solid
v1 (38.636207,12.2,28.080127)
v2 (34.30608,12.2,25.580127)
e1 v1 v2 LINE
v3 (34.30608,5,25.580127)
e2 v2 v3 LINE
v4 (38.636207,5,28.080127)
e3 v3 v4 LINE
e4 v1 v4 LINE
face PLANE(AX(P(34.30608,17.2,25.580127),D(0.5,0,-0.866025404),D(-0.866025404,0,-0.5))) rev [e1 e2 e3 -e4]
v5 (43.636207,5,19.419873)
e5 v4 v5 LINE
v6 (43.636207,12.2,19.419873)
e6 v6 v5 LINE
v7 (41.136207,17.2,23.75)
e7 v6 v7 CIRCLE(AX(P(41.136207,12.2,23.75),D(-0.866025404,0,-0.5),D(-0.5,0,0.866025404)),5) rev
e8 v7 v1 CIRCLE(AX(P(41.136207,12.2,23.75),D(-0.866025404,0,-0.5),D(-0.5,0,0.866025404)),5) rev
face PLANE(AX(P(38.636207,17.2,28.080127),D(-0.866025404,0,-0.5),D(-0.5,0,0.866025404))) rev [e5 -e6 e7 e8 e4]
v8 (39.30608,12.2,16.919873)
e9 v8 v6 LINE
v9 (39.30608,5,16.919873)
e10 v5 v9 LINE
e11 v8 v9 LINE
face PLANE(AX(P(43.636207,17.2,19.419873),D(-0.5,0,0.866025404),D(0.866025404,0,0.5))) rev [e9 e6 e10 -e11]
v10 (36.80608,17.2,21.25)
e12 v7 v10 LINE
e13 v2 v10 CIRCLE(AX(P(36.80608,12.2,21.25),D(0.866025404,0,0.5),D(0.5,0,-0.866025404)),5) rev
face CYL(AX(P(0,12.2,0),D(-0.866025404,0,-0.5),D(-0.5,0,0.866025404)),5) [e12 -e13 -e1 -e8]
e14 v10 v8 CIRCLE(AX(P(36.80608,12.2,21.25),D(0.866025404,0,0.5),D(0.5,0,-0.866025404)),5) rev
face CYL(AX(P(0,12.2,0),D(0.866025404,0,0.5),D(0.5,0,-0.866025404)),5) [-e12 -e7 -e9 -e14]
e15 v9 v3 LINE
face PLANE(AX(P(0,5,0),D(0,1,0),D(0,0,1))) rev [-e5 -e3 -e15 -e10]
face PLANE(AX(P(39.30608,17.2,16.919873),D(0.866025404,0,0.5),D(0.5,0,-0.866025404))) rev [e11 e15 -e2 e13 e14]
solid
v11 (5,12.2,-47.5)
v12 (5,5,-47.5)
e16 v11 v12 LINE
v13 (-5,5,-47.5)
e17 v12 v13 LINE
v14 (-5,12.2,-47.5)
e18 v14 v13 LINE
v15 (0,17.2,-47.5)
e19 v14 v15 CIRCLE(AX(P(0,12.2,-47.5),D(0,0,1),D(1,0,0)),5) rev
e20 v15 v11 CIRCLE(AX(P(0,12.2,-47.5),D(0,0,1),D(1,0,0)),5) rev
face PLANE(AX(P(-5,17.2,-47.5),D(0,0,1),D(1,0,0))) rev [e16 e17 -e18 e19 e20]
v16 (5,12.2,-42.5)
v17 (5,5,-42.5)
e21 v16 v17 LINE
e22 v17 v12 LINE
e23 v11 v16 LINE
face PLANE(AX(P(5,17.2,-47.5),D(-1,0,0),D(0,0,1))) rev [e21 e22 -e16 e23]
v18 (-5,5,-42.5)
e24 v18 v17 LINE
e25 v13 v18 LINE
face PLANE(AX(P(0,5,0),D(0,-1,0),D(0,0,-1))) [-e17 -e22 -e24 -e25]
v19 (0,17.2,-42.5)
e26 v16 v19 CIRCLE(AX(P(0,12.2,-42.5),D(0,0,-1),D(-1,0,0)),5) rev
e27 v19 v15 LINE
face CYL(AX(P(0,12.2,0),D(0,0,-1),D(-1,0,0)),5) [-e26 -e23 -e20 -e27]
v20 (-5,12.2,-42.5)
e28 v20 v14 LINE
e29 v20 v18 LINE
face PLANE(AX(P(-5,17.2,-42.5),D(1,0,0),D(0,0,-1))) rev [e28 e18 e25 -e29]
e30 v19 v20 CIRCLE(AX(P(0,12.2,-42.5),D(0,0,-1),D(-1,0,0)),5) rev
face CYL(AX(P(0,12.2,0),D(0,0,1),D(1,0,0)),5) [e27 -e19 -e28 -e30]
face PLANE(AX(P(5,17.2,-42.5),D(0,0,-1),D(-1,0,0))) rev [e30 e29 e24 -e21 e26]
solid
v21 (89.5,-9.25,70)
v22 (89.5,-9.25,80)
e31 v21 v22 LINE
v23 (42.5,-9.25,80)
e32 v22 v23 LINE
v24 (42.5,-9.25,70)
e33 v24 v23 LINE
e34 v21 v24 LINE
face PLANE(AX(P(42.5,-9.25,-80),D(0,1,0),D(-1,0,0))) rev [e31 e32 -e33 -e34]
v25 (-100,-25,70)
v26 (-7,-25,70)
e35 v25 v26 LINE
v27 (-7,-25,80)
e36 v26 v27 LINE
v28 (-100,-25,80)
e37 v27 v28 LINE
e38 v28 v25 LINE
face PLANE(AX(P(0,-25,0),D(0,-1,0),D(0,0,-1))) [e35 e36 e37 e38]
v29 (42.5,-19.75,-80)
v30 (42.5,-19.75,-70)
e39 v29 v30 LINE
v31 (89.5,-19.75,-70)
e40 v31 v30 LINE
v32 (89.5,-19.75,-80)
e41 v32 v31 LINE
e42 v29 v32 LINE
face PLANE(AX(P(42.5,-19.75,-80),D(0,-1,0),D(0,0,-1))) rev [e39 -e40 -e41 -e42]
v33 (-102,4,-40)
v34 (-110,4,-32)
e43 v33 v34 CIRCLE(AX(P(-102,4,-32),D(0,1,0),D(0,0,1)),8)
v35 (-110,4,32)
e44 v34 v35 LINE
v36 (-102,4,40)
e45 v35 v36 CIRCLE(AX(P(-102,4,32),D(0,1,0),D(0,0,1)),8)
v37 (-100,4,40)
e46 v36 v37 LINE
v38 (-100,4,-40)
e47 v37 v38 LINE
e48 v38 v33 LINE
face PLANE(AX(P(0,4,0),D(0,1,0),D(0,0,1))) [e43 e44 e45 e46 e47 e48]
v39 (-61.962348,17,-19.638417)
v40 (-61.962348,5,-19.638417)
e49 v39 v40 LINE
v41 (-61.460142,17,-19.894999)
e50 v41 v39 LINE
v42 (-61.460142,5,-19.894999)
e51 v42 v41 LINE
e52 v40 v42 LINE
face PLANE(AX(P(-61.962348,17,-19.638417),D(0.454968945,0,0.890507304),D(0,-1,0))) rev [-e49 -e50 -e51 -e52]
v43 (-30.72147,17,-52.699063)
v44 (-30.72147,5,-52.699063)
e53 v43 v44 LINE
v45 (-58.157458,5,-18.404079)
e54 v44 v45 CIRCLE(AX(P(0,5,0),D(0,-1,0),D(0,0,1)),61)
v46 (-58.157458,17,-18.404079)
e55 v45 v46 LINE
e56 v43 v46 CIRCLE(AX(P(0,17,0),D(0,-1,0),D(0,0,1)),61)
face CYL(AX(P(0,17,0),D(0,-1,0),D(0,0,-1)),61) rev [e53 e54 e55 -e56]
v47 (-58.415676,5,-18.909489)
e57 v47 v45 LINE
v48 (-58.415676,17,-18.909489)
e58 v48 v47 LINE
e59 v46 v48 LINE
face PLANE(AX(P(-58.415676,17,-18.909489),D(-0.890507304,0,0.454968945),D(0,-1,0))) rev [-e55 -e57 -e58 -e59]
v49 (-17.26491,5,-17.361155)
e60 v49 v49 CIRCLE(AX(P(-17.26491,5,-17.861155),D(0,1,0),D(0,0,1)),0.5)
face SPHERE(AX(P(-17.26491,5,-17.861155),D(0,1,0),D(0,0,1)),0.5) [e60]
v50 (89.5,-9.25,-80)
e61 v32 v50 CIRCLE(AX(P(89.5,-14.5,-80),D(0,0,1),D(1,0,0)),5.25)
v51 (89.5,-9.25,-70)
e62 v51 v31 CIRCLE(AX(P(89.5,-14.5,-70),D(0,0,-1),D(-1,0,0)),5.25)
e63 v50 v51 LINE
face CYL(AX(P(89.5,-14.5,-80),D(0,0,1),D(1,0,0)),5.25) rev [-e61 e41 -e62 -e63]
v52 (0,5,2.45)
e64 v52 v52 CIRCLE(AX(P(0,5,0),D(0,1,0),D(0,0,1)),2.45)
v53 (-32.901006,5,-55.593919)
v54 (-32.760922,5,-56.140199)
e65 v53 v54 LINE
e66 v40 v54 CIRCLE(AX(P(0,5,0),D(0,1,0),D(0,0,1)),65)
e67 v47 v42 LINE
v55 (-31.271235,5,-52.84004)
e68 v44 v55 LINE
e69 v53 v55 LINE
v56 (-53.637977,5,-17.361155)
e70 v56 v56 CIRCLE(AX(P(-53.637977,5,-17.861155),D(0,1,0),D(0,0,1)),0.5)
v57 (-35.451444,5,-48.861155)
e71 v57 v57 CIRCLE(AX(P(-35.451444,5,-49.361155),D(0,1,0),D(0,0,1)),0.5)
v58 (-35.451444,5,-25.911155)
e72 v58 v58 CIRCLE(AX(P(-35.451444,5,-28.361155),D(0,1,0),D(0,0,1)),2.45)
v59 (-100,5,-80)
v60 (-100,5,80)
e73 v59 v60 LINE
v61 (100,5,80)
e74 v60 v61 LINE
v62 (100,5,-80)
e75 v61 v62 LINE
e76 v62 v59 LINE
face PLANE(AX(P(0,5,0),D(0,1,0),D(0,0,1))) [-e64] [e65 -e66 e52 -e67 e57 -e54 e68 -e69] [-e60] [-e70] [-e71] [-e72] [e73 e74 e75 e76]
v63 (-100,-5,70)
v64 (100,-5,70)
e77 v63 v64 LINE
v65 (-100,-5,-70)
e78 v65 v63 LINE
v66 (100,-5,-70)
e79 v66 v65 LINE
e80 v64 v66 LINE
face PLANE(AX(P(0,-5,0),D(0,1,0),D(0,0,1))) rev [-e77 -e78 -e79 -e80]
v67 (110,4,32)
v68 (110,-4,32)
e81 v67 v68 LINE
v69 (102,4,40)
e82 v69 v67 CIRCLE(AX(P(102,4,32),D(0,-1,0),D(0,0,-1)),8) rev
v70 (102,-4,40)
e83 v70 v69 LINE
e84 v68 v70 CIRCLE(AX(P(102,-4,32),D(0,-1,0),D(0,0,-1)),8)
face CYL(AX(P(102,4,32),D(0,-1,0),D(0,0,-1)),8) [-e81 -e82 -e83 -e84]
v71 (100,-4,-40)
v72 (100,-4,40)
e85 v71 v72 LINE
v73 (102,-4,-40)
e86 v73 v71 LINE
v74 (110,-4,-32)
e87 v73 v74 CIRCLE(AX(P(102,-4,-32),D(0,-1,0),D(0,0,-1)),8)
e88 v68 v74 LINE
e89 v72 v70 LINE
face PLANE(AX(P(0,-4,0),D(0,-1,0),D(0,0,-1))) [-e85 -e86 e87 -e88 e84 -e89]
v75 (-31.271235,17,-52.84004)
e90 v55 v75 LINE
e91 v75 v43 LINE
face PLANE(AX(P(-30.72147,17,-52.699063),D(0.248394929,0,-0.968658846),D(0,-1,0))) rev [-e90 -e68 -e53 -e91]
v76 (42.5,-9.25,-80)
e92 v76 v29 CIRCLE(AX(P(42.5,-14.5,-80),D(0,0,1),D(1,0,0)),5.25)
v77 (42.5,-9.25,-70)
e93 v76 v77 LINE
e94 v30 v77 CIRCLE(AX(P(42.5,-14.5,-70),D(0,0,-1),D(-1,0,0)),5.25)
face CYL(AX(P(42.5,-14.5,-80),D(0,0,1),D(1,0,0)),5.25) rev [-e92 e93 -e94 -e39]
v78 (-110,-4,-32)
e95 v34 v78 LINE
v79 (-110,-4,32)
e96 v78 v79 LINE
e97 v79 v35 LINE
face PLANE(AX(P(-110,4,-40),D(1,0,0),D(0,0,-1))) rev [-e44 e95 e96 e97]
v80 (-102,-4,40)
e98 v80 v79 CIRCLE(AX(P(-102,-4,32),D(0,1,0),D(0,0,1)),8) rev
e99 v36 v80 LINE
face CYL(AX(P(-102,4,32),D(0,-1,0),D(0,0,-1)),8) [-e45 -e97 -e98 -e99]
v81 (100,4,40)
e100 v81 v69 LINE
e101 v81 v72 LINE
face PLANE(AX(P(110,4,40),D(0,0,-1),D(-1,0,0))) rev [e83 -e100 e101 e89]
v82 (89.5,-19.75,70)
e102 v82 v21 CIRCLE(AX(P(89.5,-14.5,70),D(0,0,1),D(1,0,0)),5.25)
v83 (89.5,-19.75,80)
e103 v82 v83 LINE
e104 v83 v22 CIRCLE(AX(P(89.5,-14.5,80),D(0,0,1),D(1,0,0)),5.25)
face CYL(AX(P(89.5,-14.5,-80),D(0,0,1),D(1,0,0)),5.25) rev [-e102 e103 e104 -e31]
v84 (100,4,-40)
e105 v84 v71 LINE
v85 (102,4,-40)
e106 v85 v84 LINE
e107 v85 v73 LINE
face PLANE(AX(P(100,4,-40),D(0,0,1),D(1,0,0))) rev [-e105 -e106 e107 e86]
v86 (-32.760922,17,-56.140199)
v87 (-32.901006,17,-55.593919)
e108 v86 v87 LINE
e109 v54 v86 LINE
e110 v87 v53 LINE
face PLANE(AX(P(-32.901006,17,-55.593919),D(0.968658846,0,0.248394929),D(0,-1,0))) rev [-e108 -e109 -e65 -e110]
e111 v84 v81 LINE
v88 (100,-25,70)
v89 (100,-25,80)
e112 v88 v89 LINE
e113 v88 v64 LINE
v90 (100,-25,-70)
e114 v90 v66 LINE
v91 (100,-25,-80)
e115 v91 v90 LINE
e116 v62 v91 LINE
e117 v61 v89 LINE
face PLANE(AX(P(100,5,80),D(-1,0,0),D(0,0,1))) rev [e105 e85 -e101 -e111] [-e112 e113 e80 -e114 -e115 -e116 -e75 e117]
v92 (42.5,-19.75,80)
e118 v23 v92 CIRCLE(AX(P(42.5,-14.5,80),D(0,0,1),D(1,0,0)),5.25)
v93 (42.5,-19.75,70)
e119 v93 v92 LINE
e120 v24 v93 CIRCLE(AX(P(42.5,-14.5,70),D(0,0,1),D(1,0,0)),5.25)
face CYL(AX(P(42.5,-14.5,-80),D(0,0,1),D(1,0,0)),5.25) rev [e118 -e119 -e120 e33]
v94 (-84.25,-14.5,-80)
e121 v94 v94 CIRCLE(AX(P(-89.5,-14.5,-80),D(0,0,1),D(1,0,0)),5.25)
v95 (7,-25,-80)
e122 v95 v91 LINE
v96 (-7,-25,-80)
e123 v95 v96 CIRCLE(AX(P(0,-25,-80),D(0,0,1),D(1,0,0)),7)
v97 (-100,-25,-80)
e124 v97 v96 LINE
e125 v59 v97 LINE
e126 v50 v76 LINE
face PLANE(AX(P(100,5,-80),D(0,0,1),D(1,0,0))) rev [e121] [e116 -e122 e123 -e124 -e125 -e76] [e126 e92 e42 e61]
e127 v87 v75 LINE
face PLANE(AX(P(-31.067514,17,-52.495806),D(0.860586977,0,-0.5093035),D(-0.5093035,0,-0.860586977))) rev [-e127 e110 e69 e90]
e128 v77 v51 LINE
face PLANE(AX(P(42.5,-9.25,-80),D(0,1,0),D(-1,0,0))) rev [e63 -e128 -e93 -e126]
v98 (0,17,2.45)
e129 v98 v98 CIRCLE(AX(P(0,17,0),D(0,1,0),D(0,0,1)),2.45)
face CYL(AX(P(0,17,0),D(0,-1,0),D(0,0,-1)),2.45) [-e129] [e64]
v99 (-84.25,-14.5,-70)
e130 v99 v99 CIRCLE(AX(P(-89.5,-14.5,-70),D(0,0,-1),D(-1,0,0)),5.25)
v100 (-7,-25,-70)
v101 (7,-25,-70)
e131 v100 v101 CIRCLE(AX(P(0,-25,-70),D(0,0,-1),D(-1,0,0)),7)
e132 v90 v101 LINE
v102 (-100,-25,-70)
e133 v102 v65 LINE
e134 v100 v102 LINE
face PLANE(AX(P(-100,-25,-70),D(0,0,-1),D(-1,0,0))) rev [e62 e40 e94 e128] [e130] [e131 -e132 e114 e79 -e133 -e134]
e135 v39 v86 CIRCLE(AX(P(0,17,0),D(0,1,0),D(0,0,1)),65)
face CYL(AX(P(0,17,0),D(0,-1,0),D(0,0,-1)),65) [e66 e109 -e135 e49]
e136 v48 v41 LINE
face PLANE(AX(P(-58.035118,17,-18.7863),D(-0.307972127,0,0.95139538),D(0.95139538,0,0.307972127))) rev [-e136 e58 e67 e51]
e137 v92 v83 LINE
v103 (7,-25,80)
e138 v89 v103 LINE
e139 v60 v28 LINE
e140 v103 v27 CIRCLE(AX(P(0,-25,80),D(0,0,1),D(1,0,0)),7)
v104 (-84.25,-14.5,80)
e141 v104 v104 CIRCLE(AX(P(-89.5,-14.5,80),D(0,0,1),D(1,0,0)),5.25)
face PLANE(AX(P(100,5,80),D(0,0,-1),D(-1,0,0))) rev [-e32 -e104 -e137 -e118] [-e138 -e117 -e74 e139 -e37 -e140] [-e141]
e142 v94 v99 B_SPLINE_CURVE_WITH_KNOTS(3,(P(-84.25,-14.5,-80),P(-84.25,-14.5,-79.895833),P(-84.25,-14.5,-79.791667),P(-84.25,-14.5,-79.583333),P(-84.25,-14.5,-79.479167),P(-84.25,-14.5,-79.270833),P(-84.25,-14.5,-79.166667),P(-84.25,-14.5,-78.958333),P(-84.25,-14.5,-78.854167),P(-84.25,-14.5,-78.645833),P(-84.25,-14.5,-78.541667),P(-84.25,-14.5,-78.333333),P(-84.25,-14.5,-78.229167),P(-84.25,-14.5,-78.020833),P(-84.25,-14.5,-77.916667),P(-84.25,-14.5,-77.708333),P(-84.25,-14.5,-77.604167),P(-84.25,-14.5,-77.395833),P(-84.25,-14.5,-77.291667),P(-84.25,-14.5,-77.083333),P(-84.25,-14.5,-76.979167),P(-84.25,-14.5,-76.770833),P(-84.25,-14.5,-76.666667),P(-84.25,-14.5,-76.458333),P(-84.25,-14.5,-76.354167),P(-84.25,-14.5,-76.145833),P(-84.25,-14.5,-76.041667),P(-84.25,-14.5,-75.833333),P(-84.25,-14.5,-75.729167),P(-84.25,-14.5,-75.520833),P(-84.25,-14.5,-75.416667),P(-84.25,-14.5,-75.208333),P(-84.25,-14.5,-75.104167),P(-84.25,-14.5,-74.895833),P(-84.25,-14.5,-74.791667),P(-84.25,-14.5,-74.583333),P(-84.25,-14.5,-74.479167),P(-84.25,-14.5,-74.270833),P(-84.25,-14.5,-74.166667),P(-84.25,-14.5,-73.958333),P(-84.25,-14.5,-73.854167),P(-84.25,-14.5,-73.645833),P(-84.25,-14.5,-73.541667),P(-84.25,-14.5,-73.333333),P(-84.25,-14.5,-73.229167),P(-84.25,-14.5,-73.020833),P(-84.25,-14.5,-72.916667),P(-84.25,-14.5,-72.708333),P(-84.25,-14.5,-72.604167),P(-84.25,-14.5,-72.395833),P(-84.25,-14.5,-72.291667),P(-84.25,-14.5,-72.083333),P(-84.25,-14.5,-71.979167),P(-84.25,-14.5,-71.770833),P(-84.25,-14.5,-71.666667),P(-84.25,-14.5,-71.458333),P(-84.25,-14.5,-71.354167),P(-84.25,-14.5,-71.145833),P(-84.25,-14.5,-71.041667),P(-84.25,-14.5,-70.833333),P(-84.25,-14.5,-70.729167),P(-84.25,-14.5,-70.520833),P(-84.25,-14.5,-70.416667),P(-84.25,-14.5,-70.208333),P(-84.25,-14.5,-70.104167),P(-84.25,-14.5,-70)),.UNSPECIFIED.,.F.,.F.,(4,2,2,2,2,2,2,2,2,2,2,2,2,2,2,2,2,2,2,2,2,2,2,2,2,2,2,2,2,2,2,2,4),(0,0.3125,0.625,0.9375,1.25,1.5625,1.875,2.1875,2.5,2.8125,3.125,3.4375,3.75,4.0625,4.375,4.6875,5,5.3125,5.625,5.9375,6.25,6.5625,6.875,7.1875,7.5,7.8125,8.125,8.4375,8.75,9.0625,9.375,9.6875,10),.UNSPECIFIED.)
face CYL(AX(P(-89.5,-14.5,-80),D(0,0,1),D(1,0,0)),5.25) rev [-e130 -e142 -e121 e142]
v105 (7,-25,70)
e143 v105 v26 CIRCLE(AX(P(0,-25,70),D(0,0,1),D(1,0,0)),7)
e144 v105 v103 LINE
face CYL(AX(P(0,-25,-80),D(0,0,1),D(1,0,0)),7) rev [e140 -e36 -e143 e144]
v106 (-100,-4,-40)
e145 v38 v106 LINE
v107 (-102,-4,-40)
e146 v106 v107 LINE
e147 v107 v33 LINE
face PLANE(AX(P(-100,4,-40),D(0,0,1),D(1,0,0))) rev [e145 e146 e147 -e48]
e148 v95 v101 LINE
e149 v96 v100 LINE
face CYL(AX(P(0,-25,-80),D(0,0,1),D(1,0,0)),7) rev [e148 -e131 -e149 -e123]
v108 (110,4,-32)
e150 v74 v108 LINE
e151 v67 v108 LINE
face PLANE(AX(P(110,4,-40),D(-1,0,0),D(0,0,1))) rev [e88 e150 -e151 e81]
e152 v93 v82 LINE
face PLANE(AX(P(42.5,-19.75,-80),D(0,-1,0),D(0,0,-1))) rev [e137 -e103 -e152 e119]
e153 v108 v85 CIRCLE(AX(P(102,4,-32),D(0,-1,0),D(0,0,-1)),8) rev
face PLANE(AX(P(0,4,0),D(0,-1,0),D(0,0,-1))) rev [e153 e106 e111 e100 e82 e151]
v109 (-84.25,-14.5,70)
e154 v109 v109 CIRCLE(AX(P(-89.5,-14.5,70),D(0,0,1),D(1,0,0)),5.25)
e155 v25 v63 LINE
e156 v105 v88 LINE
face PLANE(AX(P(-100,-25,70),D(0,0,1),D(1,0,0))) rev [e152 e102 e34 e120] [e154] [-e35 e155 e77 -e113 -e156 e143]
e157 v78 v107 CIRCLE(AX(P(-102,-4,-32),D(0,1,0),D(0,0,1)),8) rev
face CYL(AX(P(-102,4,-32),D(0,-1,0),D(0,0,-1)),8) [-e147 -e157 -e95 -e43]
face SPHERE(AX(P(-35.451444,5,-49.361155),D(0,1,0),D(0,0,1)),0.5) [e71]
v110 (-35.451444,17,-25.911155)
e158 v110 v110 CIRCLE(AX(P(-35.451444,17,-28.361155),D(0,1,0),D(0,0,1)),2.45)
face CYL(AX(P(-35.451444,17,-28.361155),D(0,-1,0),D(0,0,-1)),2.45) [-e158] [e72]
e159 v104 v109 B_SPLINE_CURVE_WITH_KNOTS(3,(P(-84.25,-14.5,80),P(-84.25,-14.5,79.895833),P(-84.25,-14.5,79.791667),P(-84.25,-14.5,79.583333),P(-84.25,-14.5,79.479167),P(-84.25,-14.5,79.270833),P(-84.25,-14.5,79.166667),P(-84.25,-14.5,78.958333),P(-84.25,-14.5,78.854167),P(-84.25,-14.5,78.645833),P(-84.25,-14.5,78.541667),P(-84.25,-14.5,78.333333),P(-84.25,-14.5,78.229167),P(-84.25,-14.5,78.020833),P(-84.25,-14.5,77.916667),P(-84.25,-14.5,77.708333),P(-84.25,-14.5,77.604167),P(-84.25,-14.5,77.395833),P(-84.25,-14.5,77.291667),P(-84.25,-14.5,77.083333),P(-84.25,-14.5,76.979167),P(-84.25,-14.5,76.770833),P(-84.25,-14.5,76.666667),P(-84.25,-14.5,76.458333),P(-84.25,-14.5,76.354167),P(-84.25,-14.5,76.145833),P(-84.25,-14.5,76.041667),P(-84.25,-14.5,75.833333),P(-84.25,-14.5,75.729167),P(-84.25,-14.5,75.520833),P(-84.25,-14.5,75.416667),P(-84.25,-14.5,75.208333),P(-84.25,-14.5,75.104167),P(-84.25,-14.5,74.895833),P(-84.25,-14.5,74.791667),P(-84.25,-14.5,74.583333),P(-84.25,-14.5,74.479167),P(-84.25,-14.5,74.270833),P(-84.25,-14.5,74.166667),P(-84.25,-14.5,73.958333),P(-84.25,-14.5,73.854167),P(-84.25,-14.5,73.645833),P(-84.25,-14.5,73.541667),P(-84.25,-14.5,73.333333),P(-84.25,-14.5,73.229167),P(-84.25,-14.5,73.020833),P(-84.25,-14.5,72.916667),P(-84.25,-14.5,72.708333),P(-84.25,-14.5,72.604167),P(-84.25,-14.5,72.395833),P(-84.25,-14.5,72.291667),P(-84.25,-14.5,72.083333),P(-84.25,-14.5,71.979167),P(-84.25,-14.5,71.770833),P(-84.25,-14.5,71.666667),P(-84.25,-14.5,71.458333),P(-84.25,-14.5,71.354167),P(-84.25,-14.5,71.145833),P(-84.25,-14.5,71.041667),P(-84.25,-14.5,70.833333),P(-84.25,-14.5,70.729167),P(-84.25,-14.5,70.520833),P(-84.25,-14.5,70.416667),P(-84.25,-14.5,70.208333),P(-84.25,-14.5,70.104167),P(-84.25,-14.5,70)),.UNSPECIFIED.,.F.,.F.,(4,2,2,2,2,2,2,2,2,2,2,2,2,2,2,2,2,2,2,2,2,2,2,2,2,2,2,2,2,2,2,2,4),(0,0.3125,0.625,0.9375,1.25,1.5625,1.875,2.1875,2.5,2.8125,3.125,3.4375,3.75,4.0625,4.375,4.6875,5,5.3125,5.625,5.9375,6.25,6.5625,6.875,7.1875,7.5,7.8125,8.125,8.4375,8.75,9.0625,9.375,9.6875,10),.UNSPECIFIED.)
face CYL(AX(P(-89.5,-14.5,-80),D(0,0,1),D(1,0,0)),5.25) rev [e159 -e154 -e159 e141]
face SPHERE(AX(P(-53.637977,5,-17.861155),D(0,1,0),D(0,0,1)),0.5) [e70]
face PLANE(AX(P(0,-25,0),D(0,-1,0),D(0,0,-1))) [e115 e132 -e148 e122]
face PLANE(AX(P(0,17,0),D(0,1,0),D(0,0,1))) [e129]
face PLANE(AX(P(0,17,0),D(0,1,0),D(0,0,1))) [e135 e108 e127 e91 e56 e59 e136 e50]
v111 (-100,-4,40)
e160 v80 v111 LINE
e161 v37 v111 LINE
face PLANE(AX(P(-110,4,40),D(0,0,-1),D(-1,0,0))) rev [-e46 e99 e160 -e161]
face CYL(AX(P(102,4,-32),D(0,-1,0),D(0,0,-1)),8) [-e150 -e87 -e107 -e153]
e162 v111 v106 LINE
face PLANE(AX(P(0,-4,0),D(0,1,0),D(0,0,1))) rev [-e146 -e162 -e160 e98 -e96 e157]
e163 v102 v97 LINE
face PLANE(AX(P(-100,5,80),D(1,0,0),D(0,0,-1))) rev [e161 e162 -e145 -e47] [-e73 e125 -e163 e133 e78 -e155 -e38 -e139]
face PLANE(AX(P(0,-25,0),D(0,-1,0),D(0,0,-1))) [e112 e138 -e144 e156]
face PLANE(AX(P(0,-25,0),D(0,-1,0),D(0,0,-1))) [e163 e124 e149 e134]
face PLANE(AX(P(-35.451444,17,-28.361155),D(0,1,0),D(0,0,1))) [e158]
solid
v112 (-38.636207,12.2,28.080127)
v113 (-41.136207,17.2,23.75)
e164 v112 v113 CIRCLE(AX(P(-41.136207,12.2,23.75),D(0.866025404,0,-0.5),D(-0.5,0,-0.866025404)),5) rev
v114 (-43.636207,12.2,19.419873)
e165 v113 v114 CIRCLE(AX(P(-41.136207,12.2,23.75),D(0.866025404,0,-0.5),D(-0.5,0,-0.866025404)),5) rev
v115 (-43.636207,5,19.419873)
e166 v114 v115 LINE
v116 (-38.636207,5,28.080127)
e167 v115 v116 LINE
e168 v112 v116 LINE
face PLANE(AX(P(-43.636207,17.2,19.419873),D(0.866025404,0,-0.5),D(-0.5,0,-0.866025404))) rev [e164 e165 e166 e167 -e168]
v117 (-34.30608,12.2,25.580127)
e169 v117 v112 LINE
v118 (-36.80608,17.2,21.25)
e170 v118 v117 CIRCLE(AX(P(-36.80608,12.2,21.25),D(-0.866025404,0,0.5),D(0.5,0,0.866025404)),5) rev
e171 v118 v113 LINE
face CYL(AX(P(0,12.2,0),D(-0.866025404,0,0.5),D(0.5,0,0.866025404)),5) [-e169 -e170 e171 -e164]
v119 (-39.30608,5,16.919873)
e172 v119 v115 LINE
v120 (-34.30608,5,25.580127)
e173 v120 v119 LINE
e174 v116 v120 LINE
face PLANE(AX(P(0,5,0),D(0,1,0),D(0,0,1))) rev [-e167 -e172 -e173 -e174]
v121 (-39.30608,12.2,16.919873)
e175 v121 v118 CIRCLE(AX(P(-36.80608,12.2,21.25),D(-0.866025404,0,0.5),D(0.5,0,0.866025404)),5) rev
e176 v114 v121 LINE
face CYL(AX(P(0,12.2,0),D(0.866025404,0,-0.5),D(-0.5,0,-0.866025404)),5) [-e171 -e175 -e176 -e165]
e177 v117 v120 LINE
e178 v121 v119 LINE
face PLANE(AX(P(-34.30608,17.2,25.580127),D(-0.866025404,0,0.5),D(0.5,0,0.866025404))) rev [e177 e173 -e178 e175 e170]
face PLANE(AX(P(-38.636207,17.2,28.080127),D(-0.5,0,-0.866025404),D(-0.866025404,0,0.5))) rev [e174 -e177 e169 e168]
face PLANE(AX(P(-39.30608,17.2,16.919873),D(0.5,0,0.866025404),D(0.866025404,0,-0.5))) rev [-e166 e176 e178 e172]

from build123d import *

# Parameters (mm, degrees)
SKIZZE1_W                            = 200
SKIZZE1_H                            = 160
AUFSATZ_LINEAR_AUSTRAGEN1_DEPTH      = 5
SKIZZE2_W                            = 200
SKIZZE2_H                            = 10
AUFSATZ_LINEAR_AUSTRAGEN2_DEPTH      = 20
SCHNITT_LINEAR_AUSTRAGEN1_DEPTH      = 131.479883507
SCHNITT_LINEAR_AUSTRAGEN1_DEPTH_BACK = 131.479883507
SKIZZE3_R                            = 5.25
SKIZZE4_R                            = 2.45
AUFSATZ_LINEAR_AUSTRAGEN3_DEPTH      = 12
FASE1_SIZE                           = 0.4
AUFSATZ_LINEAR_AUSTRAGEN4_DEPTH      = 12.2
AUFSATZ_LINEAR_AUSTRAGEN4_2_DEPTH    = 12.2
SKIZZE6_W                            = 10
SKIZZE6_H                            = 5
AUFSATZ_LINEAR_AUSTRAGEN4_3_DEPTH    = 12.2
VERRUNDUNG1_R                        = 5
VERRUNDUNG2_R                        = 5
VERRUNDUNG3_R                        = 5
SKIZZE7_W                            = 10
SKIZZE7_H                            = 80
AUFSATZ_LINEAR_AUSTRAGEN5_DEPTH      = 4
VERRUNDUNG4_R                        = 8
SKIZZE8_R                            = 0.5
AUFSATZ_LINEAR_AUSTRAGEN6_DEPTH      = 0.5
VERRUNDUNG5_R                        = 0.5


with BuildPart() as part:
    # Skizze1 → Aufsatz-Linear austragen1 (new, symmetric)
    with BuildSketch(Plane(origin=(0, 0, 0), x_dir=(1, 0, 0), z_dir=(0, 1, 0))):
        Rectangle(SKIZZE1_W, SKIZZE1_H)
    extrude(amount=AUFSATZ_LINEAR_AUSTRAGEN1_DEPTH, both=True)

    # Skizze2 → Aufsatz-Linear austragen2 (add)
    with BuildSketch(Plane(origin=(0, -5, 0), x_dir=(-1, 0, 0), z_dir=(0, -1, 0))):
        with Locations((0, 75)):
            Rectangle(SKIZZE2_W, SKIZZE2_H)
        with Locations((0, -75)):
            Rectangle(SKIZZE2_W, SKIZZE2_H)
    extrude(amount=AUFSATZ_LINEAR_AUSTRAGEN2_DEPTH)

    # Skizze3 → Schnitt-Linear austragen1 (cut, two sides: drawn at the far end of the back side and taken through both)
    with BuildSketch(Plane.XY.offset(-SCHNITT_LINEAR_AUSTRAGEN1_DEPTH_BACK)):
        with Locations((-89.5, -14.5)):
            Circle(SKIZZE3_R)
        with BuildLine():
            Line((42.5, -9.25), (89.5, -9.25))
            ThreePointArc((89.5, -9.25), (94.75, -14.5), (89.5, -19.75))
            Line((89.5, -19.75), (42.5, -19.75))
            ThreePointArc((42.5, -19.75), (37.25, -14.5), (42.5, -9.25))
        make_face()
        with BuildLine():
            Line((-7, -25), (7, -25))
            ThreePointArc((7, -25), (0, -18), (-7, -25))
        make_face()
    extrude(amount=SCHNITT_LINEAR_AUSTRAGEN1_DEPTH + SCHNITT_LINEAR_AUSTRAGEN1_DEPTH_BACK, mode=Mode.SUBTRACT)

    # Skizze4 → Aufsatz-Linear austragen3 (add)
    with BuildSketch(Plane(origin=(0, 5, 0), x_dir=(1, 0, 0), z_dir=(0, 1, 0))):
        with Locations(Location((0, 0, 0), (0, 0, 270))):
            Circle(SKIZZE4_R)
        with Locations(Location((-35.451443949, 28.361155159, 0), (0, 0, 270))):
            Circle(SKIZZE4_R)
        with BuildLine():
            Line((-58.035118175, 18.786299755), (-61.840699694, 20.018188263))
            ThreePointArc((-61.840699694, 20.018188263), (50.756472614, -40.605178091), (-33.104727507, 55.938153498))
            Line((-33.104727507, 55.938153498), (-31.067513506, 52.49580559))
            ThreePointArc((-31.067513506, 52.49580559), (47.632997376, -38.106397901), (-58.035118175, 18.786299755))
        make_face()
    extrude(amount=AUFSATZ_LINEAR_AUSTRAGEN3_DEPTH)

    # Fase1
    fase1_edges = [part.edges().sort_by_distance(p)[0] for p in [
        (-31.067513506, 11, -52.49580559),
        (-58.035118175, 11, -18.786299755),
        (-61.840699694, 11, -20.018188263),
        (-33.104727507, 11, -55.938153498),
    ]]
    chamfer(fase1_edges, length=FASE1_SIZE)

    # Skizze7 → Aufsatz-Linear austragen5 (add, symmetric)
    with BuildSketch(Plane(origin=(0, 0, 0), x_dir=(1, 0, 0), z_dir=(0, 1, 0))):
        with Locations((-105, 0)):
            Rectangle(SKIZZE7_W, SKIZZE7_H)
        with Locations((105, 0)):
            Rectangle(SKIZZE7_W, SKIZZE7_H)
    extrude(amount=AUFSATZ_LINEAR_AUSTRAGEN5_DEPTH, both=True)

    # Verrundung4
    verrundung4_edges = [part.edges().sort_by_distance(p)[0] for p in [
        (-110, 0, -40),
        (-110, 0, 40),
        (110, 0, -40),
        (110, 0, 40),
    ]]
    fillet(verrundung4_edges, radius=VERRUNDUNG4_R)

    # Skizze8 → Aufsatz-Linear austragen6 (add)
    with BuildSketch(Plane(origin=(0, 5, 0), x_dir=(1, 0, 0), z_dir=(0, 1, 0))):
        with Locations(Location((-35.451443949, 49.361155159, 0), (0, 0, 270))):
            Circle(SKIZZE8_R)
        with Locations(Location((-53.637977428, 17.861155159, 0), (0, 0, 270))):
            Circle(SKIZZE8_R)
        with Locations(Location((-17.264910469, 17.861155159, 0), (0, 0, 270))):
            Circle(SKIZZE8_R)
    extrude(amount=AUFSATZ_LINEAR_AUSTRAGEN6_DEPTH)

    # Verrundung5
    verrundung5_edges = [part.edges().sort_by_distance(p)[0] for p in [
        (-35.451443949, 5.5, -49.861155159),
        (-53.637977428, 5.5, -18.361155159),
        (-17.264910469, 5.5, -18.361155159),
    ]]
    fillet(verrundung5_edges, radius=VERRUNDUNG5_R - 0.0001)  # a hair under: the kernel refuses the full size


with BuildPart() as body_2:
    # Skizze6 → Aufsatz-Linear austragen4 (new body)
    with BuildSketch(Plane(origin=(0, 5, 0), x_dir=(1, 0, 0), z_dir=(0, 1, 0))):
        Polygon((43.63620668, -19.419872981), (39.306079661, -16.919872981), (34.306079661, -25.580127019), (38.63620668, -28.080127019), align=None)
    extrude(amount=AUFSATZ_LINEAR_AUSTRAGEN4_DEPTH)

    # Verrundung1
    verrundung1_edges = [body_2.edges().sort_by_distance(p)[0] for p in [
        (36.47114317, 17.2, 26.830127019),
        (41.47114317, 17.2, 18.169872981),
    ]]
    fillet(verrundung1_edges, radius=VERRUNDUNG1_R - 0.0001)  # a hair under: the kernel refuses the full size


with BuildPart() as body_3:
    # Skizze6 → Aufsatz-Linear austragen4 2 (new body)
    with BuildSketch(Plane(origin=(0, 5, 0), x_dir=(1, 0, 0), z_dir=(0, 1, 0))):
        Polygon((-34.306079661, -25.580127019), (-39.306079661, -16.919872981), (-43.63620668, -19.419872981), (-38.63620668, -28.080127019), align=None)
    extrude(amount=AUFSATZ_LINEAR_AUSTRAGEN4_2_DEPTH)

    # Verrundung2
    verrundung2_edges = [body_3.edges().sort_by_distance(p)[0] for p in [
        (-36.47114317, 17.2, 26.830127019),
        (-41.47114317, 17.2, 18.169872981),
    ]]
    fillet(verrundung2_edges, radius=VERRUNDUNG2_R - 0.0001)  # a hair under: the kernel refuses the full size


with BuildPart() as body_4:
    # Skizze6 → Aufsatz-Linear austragen4 3 (new body)
    with BuildSketch(Plane(origin=(0, 5, 0), x_dir=(1, 0, 0), z_dir=(0, 1, 0))):
        with Locations((0, 45)):
            Rectangle(SKIZZE6_W, SKIZZE6_H)
    extrude(amount=AUFSATZ_LINEAR_AUSTRAGEN4_3_DEPTH)

    # Verrundung3
    verrundung3_edges = [body_4.edges().sort_by_distance(p)[0] for p in [
        (-5, 17.2, -45),
        (5, 17.2, -45),
    ]]
    fillet(verrundung3_edges, radius=VERRUNDUNG3_R - 0.0001)  # a hair under: the kernel refuses the full size


solid = Compound([part.part, body_2.part, body_3.part, body_4.part])
